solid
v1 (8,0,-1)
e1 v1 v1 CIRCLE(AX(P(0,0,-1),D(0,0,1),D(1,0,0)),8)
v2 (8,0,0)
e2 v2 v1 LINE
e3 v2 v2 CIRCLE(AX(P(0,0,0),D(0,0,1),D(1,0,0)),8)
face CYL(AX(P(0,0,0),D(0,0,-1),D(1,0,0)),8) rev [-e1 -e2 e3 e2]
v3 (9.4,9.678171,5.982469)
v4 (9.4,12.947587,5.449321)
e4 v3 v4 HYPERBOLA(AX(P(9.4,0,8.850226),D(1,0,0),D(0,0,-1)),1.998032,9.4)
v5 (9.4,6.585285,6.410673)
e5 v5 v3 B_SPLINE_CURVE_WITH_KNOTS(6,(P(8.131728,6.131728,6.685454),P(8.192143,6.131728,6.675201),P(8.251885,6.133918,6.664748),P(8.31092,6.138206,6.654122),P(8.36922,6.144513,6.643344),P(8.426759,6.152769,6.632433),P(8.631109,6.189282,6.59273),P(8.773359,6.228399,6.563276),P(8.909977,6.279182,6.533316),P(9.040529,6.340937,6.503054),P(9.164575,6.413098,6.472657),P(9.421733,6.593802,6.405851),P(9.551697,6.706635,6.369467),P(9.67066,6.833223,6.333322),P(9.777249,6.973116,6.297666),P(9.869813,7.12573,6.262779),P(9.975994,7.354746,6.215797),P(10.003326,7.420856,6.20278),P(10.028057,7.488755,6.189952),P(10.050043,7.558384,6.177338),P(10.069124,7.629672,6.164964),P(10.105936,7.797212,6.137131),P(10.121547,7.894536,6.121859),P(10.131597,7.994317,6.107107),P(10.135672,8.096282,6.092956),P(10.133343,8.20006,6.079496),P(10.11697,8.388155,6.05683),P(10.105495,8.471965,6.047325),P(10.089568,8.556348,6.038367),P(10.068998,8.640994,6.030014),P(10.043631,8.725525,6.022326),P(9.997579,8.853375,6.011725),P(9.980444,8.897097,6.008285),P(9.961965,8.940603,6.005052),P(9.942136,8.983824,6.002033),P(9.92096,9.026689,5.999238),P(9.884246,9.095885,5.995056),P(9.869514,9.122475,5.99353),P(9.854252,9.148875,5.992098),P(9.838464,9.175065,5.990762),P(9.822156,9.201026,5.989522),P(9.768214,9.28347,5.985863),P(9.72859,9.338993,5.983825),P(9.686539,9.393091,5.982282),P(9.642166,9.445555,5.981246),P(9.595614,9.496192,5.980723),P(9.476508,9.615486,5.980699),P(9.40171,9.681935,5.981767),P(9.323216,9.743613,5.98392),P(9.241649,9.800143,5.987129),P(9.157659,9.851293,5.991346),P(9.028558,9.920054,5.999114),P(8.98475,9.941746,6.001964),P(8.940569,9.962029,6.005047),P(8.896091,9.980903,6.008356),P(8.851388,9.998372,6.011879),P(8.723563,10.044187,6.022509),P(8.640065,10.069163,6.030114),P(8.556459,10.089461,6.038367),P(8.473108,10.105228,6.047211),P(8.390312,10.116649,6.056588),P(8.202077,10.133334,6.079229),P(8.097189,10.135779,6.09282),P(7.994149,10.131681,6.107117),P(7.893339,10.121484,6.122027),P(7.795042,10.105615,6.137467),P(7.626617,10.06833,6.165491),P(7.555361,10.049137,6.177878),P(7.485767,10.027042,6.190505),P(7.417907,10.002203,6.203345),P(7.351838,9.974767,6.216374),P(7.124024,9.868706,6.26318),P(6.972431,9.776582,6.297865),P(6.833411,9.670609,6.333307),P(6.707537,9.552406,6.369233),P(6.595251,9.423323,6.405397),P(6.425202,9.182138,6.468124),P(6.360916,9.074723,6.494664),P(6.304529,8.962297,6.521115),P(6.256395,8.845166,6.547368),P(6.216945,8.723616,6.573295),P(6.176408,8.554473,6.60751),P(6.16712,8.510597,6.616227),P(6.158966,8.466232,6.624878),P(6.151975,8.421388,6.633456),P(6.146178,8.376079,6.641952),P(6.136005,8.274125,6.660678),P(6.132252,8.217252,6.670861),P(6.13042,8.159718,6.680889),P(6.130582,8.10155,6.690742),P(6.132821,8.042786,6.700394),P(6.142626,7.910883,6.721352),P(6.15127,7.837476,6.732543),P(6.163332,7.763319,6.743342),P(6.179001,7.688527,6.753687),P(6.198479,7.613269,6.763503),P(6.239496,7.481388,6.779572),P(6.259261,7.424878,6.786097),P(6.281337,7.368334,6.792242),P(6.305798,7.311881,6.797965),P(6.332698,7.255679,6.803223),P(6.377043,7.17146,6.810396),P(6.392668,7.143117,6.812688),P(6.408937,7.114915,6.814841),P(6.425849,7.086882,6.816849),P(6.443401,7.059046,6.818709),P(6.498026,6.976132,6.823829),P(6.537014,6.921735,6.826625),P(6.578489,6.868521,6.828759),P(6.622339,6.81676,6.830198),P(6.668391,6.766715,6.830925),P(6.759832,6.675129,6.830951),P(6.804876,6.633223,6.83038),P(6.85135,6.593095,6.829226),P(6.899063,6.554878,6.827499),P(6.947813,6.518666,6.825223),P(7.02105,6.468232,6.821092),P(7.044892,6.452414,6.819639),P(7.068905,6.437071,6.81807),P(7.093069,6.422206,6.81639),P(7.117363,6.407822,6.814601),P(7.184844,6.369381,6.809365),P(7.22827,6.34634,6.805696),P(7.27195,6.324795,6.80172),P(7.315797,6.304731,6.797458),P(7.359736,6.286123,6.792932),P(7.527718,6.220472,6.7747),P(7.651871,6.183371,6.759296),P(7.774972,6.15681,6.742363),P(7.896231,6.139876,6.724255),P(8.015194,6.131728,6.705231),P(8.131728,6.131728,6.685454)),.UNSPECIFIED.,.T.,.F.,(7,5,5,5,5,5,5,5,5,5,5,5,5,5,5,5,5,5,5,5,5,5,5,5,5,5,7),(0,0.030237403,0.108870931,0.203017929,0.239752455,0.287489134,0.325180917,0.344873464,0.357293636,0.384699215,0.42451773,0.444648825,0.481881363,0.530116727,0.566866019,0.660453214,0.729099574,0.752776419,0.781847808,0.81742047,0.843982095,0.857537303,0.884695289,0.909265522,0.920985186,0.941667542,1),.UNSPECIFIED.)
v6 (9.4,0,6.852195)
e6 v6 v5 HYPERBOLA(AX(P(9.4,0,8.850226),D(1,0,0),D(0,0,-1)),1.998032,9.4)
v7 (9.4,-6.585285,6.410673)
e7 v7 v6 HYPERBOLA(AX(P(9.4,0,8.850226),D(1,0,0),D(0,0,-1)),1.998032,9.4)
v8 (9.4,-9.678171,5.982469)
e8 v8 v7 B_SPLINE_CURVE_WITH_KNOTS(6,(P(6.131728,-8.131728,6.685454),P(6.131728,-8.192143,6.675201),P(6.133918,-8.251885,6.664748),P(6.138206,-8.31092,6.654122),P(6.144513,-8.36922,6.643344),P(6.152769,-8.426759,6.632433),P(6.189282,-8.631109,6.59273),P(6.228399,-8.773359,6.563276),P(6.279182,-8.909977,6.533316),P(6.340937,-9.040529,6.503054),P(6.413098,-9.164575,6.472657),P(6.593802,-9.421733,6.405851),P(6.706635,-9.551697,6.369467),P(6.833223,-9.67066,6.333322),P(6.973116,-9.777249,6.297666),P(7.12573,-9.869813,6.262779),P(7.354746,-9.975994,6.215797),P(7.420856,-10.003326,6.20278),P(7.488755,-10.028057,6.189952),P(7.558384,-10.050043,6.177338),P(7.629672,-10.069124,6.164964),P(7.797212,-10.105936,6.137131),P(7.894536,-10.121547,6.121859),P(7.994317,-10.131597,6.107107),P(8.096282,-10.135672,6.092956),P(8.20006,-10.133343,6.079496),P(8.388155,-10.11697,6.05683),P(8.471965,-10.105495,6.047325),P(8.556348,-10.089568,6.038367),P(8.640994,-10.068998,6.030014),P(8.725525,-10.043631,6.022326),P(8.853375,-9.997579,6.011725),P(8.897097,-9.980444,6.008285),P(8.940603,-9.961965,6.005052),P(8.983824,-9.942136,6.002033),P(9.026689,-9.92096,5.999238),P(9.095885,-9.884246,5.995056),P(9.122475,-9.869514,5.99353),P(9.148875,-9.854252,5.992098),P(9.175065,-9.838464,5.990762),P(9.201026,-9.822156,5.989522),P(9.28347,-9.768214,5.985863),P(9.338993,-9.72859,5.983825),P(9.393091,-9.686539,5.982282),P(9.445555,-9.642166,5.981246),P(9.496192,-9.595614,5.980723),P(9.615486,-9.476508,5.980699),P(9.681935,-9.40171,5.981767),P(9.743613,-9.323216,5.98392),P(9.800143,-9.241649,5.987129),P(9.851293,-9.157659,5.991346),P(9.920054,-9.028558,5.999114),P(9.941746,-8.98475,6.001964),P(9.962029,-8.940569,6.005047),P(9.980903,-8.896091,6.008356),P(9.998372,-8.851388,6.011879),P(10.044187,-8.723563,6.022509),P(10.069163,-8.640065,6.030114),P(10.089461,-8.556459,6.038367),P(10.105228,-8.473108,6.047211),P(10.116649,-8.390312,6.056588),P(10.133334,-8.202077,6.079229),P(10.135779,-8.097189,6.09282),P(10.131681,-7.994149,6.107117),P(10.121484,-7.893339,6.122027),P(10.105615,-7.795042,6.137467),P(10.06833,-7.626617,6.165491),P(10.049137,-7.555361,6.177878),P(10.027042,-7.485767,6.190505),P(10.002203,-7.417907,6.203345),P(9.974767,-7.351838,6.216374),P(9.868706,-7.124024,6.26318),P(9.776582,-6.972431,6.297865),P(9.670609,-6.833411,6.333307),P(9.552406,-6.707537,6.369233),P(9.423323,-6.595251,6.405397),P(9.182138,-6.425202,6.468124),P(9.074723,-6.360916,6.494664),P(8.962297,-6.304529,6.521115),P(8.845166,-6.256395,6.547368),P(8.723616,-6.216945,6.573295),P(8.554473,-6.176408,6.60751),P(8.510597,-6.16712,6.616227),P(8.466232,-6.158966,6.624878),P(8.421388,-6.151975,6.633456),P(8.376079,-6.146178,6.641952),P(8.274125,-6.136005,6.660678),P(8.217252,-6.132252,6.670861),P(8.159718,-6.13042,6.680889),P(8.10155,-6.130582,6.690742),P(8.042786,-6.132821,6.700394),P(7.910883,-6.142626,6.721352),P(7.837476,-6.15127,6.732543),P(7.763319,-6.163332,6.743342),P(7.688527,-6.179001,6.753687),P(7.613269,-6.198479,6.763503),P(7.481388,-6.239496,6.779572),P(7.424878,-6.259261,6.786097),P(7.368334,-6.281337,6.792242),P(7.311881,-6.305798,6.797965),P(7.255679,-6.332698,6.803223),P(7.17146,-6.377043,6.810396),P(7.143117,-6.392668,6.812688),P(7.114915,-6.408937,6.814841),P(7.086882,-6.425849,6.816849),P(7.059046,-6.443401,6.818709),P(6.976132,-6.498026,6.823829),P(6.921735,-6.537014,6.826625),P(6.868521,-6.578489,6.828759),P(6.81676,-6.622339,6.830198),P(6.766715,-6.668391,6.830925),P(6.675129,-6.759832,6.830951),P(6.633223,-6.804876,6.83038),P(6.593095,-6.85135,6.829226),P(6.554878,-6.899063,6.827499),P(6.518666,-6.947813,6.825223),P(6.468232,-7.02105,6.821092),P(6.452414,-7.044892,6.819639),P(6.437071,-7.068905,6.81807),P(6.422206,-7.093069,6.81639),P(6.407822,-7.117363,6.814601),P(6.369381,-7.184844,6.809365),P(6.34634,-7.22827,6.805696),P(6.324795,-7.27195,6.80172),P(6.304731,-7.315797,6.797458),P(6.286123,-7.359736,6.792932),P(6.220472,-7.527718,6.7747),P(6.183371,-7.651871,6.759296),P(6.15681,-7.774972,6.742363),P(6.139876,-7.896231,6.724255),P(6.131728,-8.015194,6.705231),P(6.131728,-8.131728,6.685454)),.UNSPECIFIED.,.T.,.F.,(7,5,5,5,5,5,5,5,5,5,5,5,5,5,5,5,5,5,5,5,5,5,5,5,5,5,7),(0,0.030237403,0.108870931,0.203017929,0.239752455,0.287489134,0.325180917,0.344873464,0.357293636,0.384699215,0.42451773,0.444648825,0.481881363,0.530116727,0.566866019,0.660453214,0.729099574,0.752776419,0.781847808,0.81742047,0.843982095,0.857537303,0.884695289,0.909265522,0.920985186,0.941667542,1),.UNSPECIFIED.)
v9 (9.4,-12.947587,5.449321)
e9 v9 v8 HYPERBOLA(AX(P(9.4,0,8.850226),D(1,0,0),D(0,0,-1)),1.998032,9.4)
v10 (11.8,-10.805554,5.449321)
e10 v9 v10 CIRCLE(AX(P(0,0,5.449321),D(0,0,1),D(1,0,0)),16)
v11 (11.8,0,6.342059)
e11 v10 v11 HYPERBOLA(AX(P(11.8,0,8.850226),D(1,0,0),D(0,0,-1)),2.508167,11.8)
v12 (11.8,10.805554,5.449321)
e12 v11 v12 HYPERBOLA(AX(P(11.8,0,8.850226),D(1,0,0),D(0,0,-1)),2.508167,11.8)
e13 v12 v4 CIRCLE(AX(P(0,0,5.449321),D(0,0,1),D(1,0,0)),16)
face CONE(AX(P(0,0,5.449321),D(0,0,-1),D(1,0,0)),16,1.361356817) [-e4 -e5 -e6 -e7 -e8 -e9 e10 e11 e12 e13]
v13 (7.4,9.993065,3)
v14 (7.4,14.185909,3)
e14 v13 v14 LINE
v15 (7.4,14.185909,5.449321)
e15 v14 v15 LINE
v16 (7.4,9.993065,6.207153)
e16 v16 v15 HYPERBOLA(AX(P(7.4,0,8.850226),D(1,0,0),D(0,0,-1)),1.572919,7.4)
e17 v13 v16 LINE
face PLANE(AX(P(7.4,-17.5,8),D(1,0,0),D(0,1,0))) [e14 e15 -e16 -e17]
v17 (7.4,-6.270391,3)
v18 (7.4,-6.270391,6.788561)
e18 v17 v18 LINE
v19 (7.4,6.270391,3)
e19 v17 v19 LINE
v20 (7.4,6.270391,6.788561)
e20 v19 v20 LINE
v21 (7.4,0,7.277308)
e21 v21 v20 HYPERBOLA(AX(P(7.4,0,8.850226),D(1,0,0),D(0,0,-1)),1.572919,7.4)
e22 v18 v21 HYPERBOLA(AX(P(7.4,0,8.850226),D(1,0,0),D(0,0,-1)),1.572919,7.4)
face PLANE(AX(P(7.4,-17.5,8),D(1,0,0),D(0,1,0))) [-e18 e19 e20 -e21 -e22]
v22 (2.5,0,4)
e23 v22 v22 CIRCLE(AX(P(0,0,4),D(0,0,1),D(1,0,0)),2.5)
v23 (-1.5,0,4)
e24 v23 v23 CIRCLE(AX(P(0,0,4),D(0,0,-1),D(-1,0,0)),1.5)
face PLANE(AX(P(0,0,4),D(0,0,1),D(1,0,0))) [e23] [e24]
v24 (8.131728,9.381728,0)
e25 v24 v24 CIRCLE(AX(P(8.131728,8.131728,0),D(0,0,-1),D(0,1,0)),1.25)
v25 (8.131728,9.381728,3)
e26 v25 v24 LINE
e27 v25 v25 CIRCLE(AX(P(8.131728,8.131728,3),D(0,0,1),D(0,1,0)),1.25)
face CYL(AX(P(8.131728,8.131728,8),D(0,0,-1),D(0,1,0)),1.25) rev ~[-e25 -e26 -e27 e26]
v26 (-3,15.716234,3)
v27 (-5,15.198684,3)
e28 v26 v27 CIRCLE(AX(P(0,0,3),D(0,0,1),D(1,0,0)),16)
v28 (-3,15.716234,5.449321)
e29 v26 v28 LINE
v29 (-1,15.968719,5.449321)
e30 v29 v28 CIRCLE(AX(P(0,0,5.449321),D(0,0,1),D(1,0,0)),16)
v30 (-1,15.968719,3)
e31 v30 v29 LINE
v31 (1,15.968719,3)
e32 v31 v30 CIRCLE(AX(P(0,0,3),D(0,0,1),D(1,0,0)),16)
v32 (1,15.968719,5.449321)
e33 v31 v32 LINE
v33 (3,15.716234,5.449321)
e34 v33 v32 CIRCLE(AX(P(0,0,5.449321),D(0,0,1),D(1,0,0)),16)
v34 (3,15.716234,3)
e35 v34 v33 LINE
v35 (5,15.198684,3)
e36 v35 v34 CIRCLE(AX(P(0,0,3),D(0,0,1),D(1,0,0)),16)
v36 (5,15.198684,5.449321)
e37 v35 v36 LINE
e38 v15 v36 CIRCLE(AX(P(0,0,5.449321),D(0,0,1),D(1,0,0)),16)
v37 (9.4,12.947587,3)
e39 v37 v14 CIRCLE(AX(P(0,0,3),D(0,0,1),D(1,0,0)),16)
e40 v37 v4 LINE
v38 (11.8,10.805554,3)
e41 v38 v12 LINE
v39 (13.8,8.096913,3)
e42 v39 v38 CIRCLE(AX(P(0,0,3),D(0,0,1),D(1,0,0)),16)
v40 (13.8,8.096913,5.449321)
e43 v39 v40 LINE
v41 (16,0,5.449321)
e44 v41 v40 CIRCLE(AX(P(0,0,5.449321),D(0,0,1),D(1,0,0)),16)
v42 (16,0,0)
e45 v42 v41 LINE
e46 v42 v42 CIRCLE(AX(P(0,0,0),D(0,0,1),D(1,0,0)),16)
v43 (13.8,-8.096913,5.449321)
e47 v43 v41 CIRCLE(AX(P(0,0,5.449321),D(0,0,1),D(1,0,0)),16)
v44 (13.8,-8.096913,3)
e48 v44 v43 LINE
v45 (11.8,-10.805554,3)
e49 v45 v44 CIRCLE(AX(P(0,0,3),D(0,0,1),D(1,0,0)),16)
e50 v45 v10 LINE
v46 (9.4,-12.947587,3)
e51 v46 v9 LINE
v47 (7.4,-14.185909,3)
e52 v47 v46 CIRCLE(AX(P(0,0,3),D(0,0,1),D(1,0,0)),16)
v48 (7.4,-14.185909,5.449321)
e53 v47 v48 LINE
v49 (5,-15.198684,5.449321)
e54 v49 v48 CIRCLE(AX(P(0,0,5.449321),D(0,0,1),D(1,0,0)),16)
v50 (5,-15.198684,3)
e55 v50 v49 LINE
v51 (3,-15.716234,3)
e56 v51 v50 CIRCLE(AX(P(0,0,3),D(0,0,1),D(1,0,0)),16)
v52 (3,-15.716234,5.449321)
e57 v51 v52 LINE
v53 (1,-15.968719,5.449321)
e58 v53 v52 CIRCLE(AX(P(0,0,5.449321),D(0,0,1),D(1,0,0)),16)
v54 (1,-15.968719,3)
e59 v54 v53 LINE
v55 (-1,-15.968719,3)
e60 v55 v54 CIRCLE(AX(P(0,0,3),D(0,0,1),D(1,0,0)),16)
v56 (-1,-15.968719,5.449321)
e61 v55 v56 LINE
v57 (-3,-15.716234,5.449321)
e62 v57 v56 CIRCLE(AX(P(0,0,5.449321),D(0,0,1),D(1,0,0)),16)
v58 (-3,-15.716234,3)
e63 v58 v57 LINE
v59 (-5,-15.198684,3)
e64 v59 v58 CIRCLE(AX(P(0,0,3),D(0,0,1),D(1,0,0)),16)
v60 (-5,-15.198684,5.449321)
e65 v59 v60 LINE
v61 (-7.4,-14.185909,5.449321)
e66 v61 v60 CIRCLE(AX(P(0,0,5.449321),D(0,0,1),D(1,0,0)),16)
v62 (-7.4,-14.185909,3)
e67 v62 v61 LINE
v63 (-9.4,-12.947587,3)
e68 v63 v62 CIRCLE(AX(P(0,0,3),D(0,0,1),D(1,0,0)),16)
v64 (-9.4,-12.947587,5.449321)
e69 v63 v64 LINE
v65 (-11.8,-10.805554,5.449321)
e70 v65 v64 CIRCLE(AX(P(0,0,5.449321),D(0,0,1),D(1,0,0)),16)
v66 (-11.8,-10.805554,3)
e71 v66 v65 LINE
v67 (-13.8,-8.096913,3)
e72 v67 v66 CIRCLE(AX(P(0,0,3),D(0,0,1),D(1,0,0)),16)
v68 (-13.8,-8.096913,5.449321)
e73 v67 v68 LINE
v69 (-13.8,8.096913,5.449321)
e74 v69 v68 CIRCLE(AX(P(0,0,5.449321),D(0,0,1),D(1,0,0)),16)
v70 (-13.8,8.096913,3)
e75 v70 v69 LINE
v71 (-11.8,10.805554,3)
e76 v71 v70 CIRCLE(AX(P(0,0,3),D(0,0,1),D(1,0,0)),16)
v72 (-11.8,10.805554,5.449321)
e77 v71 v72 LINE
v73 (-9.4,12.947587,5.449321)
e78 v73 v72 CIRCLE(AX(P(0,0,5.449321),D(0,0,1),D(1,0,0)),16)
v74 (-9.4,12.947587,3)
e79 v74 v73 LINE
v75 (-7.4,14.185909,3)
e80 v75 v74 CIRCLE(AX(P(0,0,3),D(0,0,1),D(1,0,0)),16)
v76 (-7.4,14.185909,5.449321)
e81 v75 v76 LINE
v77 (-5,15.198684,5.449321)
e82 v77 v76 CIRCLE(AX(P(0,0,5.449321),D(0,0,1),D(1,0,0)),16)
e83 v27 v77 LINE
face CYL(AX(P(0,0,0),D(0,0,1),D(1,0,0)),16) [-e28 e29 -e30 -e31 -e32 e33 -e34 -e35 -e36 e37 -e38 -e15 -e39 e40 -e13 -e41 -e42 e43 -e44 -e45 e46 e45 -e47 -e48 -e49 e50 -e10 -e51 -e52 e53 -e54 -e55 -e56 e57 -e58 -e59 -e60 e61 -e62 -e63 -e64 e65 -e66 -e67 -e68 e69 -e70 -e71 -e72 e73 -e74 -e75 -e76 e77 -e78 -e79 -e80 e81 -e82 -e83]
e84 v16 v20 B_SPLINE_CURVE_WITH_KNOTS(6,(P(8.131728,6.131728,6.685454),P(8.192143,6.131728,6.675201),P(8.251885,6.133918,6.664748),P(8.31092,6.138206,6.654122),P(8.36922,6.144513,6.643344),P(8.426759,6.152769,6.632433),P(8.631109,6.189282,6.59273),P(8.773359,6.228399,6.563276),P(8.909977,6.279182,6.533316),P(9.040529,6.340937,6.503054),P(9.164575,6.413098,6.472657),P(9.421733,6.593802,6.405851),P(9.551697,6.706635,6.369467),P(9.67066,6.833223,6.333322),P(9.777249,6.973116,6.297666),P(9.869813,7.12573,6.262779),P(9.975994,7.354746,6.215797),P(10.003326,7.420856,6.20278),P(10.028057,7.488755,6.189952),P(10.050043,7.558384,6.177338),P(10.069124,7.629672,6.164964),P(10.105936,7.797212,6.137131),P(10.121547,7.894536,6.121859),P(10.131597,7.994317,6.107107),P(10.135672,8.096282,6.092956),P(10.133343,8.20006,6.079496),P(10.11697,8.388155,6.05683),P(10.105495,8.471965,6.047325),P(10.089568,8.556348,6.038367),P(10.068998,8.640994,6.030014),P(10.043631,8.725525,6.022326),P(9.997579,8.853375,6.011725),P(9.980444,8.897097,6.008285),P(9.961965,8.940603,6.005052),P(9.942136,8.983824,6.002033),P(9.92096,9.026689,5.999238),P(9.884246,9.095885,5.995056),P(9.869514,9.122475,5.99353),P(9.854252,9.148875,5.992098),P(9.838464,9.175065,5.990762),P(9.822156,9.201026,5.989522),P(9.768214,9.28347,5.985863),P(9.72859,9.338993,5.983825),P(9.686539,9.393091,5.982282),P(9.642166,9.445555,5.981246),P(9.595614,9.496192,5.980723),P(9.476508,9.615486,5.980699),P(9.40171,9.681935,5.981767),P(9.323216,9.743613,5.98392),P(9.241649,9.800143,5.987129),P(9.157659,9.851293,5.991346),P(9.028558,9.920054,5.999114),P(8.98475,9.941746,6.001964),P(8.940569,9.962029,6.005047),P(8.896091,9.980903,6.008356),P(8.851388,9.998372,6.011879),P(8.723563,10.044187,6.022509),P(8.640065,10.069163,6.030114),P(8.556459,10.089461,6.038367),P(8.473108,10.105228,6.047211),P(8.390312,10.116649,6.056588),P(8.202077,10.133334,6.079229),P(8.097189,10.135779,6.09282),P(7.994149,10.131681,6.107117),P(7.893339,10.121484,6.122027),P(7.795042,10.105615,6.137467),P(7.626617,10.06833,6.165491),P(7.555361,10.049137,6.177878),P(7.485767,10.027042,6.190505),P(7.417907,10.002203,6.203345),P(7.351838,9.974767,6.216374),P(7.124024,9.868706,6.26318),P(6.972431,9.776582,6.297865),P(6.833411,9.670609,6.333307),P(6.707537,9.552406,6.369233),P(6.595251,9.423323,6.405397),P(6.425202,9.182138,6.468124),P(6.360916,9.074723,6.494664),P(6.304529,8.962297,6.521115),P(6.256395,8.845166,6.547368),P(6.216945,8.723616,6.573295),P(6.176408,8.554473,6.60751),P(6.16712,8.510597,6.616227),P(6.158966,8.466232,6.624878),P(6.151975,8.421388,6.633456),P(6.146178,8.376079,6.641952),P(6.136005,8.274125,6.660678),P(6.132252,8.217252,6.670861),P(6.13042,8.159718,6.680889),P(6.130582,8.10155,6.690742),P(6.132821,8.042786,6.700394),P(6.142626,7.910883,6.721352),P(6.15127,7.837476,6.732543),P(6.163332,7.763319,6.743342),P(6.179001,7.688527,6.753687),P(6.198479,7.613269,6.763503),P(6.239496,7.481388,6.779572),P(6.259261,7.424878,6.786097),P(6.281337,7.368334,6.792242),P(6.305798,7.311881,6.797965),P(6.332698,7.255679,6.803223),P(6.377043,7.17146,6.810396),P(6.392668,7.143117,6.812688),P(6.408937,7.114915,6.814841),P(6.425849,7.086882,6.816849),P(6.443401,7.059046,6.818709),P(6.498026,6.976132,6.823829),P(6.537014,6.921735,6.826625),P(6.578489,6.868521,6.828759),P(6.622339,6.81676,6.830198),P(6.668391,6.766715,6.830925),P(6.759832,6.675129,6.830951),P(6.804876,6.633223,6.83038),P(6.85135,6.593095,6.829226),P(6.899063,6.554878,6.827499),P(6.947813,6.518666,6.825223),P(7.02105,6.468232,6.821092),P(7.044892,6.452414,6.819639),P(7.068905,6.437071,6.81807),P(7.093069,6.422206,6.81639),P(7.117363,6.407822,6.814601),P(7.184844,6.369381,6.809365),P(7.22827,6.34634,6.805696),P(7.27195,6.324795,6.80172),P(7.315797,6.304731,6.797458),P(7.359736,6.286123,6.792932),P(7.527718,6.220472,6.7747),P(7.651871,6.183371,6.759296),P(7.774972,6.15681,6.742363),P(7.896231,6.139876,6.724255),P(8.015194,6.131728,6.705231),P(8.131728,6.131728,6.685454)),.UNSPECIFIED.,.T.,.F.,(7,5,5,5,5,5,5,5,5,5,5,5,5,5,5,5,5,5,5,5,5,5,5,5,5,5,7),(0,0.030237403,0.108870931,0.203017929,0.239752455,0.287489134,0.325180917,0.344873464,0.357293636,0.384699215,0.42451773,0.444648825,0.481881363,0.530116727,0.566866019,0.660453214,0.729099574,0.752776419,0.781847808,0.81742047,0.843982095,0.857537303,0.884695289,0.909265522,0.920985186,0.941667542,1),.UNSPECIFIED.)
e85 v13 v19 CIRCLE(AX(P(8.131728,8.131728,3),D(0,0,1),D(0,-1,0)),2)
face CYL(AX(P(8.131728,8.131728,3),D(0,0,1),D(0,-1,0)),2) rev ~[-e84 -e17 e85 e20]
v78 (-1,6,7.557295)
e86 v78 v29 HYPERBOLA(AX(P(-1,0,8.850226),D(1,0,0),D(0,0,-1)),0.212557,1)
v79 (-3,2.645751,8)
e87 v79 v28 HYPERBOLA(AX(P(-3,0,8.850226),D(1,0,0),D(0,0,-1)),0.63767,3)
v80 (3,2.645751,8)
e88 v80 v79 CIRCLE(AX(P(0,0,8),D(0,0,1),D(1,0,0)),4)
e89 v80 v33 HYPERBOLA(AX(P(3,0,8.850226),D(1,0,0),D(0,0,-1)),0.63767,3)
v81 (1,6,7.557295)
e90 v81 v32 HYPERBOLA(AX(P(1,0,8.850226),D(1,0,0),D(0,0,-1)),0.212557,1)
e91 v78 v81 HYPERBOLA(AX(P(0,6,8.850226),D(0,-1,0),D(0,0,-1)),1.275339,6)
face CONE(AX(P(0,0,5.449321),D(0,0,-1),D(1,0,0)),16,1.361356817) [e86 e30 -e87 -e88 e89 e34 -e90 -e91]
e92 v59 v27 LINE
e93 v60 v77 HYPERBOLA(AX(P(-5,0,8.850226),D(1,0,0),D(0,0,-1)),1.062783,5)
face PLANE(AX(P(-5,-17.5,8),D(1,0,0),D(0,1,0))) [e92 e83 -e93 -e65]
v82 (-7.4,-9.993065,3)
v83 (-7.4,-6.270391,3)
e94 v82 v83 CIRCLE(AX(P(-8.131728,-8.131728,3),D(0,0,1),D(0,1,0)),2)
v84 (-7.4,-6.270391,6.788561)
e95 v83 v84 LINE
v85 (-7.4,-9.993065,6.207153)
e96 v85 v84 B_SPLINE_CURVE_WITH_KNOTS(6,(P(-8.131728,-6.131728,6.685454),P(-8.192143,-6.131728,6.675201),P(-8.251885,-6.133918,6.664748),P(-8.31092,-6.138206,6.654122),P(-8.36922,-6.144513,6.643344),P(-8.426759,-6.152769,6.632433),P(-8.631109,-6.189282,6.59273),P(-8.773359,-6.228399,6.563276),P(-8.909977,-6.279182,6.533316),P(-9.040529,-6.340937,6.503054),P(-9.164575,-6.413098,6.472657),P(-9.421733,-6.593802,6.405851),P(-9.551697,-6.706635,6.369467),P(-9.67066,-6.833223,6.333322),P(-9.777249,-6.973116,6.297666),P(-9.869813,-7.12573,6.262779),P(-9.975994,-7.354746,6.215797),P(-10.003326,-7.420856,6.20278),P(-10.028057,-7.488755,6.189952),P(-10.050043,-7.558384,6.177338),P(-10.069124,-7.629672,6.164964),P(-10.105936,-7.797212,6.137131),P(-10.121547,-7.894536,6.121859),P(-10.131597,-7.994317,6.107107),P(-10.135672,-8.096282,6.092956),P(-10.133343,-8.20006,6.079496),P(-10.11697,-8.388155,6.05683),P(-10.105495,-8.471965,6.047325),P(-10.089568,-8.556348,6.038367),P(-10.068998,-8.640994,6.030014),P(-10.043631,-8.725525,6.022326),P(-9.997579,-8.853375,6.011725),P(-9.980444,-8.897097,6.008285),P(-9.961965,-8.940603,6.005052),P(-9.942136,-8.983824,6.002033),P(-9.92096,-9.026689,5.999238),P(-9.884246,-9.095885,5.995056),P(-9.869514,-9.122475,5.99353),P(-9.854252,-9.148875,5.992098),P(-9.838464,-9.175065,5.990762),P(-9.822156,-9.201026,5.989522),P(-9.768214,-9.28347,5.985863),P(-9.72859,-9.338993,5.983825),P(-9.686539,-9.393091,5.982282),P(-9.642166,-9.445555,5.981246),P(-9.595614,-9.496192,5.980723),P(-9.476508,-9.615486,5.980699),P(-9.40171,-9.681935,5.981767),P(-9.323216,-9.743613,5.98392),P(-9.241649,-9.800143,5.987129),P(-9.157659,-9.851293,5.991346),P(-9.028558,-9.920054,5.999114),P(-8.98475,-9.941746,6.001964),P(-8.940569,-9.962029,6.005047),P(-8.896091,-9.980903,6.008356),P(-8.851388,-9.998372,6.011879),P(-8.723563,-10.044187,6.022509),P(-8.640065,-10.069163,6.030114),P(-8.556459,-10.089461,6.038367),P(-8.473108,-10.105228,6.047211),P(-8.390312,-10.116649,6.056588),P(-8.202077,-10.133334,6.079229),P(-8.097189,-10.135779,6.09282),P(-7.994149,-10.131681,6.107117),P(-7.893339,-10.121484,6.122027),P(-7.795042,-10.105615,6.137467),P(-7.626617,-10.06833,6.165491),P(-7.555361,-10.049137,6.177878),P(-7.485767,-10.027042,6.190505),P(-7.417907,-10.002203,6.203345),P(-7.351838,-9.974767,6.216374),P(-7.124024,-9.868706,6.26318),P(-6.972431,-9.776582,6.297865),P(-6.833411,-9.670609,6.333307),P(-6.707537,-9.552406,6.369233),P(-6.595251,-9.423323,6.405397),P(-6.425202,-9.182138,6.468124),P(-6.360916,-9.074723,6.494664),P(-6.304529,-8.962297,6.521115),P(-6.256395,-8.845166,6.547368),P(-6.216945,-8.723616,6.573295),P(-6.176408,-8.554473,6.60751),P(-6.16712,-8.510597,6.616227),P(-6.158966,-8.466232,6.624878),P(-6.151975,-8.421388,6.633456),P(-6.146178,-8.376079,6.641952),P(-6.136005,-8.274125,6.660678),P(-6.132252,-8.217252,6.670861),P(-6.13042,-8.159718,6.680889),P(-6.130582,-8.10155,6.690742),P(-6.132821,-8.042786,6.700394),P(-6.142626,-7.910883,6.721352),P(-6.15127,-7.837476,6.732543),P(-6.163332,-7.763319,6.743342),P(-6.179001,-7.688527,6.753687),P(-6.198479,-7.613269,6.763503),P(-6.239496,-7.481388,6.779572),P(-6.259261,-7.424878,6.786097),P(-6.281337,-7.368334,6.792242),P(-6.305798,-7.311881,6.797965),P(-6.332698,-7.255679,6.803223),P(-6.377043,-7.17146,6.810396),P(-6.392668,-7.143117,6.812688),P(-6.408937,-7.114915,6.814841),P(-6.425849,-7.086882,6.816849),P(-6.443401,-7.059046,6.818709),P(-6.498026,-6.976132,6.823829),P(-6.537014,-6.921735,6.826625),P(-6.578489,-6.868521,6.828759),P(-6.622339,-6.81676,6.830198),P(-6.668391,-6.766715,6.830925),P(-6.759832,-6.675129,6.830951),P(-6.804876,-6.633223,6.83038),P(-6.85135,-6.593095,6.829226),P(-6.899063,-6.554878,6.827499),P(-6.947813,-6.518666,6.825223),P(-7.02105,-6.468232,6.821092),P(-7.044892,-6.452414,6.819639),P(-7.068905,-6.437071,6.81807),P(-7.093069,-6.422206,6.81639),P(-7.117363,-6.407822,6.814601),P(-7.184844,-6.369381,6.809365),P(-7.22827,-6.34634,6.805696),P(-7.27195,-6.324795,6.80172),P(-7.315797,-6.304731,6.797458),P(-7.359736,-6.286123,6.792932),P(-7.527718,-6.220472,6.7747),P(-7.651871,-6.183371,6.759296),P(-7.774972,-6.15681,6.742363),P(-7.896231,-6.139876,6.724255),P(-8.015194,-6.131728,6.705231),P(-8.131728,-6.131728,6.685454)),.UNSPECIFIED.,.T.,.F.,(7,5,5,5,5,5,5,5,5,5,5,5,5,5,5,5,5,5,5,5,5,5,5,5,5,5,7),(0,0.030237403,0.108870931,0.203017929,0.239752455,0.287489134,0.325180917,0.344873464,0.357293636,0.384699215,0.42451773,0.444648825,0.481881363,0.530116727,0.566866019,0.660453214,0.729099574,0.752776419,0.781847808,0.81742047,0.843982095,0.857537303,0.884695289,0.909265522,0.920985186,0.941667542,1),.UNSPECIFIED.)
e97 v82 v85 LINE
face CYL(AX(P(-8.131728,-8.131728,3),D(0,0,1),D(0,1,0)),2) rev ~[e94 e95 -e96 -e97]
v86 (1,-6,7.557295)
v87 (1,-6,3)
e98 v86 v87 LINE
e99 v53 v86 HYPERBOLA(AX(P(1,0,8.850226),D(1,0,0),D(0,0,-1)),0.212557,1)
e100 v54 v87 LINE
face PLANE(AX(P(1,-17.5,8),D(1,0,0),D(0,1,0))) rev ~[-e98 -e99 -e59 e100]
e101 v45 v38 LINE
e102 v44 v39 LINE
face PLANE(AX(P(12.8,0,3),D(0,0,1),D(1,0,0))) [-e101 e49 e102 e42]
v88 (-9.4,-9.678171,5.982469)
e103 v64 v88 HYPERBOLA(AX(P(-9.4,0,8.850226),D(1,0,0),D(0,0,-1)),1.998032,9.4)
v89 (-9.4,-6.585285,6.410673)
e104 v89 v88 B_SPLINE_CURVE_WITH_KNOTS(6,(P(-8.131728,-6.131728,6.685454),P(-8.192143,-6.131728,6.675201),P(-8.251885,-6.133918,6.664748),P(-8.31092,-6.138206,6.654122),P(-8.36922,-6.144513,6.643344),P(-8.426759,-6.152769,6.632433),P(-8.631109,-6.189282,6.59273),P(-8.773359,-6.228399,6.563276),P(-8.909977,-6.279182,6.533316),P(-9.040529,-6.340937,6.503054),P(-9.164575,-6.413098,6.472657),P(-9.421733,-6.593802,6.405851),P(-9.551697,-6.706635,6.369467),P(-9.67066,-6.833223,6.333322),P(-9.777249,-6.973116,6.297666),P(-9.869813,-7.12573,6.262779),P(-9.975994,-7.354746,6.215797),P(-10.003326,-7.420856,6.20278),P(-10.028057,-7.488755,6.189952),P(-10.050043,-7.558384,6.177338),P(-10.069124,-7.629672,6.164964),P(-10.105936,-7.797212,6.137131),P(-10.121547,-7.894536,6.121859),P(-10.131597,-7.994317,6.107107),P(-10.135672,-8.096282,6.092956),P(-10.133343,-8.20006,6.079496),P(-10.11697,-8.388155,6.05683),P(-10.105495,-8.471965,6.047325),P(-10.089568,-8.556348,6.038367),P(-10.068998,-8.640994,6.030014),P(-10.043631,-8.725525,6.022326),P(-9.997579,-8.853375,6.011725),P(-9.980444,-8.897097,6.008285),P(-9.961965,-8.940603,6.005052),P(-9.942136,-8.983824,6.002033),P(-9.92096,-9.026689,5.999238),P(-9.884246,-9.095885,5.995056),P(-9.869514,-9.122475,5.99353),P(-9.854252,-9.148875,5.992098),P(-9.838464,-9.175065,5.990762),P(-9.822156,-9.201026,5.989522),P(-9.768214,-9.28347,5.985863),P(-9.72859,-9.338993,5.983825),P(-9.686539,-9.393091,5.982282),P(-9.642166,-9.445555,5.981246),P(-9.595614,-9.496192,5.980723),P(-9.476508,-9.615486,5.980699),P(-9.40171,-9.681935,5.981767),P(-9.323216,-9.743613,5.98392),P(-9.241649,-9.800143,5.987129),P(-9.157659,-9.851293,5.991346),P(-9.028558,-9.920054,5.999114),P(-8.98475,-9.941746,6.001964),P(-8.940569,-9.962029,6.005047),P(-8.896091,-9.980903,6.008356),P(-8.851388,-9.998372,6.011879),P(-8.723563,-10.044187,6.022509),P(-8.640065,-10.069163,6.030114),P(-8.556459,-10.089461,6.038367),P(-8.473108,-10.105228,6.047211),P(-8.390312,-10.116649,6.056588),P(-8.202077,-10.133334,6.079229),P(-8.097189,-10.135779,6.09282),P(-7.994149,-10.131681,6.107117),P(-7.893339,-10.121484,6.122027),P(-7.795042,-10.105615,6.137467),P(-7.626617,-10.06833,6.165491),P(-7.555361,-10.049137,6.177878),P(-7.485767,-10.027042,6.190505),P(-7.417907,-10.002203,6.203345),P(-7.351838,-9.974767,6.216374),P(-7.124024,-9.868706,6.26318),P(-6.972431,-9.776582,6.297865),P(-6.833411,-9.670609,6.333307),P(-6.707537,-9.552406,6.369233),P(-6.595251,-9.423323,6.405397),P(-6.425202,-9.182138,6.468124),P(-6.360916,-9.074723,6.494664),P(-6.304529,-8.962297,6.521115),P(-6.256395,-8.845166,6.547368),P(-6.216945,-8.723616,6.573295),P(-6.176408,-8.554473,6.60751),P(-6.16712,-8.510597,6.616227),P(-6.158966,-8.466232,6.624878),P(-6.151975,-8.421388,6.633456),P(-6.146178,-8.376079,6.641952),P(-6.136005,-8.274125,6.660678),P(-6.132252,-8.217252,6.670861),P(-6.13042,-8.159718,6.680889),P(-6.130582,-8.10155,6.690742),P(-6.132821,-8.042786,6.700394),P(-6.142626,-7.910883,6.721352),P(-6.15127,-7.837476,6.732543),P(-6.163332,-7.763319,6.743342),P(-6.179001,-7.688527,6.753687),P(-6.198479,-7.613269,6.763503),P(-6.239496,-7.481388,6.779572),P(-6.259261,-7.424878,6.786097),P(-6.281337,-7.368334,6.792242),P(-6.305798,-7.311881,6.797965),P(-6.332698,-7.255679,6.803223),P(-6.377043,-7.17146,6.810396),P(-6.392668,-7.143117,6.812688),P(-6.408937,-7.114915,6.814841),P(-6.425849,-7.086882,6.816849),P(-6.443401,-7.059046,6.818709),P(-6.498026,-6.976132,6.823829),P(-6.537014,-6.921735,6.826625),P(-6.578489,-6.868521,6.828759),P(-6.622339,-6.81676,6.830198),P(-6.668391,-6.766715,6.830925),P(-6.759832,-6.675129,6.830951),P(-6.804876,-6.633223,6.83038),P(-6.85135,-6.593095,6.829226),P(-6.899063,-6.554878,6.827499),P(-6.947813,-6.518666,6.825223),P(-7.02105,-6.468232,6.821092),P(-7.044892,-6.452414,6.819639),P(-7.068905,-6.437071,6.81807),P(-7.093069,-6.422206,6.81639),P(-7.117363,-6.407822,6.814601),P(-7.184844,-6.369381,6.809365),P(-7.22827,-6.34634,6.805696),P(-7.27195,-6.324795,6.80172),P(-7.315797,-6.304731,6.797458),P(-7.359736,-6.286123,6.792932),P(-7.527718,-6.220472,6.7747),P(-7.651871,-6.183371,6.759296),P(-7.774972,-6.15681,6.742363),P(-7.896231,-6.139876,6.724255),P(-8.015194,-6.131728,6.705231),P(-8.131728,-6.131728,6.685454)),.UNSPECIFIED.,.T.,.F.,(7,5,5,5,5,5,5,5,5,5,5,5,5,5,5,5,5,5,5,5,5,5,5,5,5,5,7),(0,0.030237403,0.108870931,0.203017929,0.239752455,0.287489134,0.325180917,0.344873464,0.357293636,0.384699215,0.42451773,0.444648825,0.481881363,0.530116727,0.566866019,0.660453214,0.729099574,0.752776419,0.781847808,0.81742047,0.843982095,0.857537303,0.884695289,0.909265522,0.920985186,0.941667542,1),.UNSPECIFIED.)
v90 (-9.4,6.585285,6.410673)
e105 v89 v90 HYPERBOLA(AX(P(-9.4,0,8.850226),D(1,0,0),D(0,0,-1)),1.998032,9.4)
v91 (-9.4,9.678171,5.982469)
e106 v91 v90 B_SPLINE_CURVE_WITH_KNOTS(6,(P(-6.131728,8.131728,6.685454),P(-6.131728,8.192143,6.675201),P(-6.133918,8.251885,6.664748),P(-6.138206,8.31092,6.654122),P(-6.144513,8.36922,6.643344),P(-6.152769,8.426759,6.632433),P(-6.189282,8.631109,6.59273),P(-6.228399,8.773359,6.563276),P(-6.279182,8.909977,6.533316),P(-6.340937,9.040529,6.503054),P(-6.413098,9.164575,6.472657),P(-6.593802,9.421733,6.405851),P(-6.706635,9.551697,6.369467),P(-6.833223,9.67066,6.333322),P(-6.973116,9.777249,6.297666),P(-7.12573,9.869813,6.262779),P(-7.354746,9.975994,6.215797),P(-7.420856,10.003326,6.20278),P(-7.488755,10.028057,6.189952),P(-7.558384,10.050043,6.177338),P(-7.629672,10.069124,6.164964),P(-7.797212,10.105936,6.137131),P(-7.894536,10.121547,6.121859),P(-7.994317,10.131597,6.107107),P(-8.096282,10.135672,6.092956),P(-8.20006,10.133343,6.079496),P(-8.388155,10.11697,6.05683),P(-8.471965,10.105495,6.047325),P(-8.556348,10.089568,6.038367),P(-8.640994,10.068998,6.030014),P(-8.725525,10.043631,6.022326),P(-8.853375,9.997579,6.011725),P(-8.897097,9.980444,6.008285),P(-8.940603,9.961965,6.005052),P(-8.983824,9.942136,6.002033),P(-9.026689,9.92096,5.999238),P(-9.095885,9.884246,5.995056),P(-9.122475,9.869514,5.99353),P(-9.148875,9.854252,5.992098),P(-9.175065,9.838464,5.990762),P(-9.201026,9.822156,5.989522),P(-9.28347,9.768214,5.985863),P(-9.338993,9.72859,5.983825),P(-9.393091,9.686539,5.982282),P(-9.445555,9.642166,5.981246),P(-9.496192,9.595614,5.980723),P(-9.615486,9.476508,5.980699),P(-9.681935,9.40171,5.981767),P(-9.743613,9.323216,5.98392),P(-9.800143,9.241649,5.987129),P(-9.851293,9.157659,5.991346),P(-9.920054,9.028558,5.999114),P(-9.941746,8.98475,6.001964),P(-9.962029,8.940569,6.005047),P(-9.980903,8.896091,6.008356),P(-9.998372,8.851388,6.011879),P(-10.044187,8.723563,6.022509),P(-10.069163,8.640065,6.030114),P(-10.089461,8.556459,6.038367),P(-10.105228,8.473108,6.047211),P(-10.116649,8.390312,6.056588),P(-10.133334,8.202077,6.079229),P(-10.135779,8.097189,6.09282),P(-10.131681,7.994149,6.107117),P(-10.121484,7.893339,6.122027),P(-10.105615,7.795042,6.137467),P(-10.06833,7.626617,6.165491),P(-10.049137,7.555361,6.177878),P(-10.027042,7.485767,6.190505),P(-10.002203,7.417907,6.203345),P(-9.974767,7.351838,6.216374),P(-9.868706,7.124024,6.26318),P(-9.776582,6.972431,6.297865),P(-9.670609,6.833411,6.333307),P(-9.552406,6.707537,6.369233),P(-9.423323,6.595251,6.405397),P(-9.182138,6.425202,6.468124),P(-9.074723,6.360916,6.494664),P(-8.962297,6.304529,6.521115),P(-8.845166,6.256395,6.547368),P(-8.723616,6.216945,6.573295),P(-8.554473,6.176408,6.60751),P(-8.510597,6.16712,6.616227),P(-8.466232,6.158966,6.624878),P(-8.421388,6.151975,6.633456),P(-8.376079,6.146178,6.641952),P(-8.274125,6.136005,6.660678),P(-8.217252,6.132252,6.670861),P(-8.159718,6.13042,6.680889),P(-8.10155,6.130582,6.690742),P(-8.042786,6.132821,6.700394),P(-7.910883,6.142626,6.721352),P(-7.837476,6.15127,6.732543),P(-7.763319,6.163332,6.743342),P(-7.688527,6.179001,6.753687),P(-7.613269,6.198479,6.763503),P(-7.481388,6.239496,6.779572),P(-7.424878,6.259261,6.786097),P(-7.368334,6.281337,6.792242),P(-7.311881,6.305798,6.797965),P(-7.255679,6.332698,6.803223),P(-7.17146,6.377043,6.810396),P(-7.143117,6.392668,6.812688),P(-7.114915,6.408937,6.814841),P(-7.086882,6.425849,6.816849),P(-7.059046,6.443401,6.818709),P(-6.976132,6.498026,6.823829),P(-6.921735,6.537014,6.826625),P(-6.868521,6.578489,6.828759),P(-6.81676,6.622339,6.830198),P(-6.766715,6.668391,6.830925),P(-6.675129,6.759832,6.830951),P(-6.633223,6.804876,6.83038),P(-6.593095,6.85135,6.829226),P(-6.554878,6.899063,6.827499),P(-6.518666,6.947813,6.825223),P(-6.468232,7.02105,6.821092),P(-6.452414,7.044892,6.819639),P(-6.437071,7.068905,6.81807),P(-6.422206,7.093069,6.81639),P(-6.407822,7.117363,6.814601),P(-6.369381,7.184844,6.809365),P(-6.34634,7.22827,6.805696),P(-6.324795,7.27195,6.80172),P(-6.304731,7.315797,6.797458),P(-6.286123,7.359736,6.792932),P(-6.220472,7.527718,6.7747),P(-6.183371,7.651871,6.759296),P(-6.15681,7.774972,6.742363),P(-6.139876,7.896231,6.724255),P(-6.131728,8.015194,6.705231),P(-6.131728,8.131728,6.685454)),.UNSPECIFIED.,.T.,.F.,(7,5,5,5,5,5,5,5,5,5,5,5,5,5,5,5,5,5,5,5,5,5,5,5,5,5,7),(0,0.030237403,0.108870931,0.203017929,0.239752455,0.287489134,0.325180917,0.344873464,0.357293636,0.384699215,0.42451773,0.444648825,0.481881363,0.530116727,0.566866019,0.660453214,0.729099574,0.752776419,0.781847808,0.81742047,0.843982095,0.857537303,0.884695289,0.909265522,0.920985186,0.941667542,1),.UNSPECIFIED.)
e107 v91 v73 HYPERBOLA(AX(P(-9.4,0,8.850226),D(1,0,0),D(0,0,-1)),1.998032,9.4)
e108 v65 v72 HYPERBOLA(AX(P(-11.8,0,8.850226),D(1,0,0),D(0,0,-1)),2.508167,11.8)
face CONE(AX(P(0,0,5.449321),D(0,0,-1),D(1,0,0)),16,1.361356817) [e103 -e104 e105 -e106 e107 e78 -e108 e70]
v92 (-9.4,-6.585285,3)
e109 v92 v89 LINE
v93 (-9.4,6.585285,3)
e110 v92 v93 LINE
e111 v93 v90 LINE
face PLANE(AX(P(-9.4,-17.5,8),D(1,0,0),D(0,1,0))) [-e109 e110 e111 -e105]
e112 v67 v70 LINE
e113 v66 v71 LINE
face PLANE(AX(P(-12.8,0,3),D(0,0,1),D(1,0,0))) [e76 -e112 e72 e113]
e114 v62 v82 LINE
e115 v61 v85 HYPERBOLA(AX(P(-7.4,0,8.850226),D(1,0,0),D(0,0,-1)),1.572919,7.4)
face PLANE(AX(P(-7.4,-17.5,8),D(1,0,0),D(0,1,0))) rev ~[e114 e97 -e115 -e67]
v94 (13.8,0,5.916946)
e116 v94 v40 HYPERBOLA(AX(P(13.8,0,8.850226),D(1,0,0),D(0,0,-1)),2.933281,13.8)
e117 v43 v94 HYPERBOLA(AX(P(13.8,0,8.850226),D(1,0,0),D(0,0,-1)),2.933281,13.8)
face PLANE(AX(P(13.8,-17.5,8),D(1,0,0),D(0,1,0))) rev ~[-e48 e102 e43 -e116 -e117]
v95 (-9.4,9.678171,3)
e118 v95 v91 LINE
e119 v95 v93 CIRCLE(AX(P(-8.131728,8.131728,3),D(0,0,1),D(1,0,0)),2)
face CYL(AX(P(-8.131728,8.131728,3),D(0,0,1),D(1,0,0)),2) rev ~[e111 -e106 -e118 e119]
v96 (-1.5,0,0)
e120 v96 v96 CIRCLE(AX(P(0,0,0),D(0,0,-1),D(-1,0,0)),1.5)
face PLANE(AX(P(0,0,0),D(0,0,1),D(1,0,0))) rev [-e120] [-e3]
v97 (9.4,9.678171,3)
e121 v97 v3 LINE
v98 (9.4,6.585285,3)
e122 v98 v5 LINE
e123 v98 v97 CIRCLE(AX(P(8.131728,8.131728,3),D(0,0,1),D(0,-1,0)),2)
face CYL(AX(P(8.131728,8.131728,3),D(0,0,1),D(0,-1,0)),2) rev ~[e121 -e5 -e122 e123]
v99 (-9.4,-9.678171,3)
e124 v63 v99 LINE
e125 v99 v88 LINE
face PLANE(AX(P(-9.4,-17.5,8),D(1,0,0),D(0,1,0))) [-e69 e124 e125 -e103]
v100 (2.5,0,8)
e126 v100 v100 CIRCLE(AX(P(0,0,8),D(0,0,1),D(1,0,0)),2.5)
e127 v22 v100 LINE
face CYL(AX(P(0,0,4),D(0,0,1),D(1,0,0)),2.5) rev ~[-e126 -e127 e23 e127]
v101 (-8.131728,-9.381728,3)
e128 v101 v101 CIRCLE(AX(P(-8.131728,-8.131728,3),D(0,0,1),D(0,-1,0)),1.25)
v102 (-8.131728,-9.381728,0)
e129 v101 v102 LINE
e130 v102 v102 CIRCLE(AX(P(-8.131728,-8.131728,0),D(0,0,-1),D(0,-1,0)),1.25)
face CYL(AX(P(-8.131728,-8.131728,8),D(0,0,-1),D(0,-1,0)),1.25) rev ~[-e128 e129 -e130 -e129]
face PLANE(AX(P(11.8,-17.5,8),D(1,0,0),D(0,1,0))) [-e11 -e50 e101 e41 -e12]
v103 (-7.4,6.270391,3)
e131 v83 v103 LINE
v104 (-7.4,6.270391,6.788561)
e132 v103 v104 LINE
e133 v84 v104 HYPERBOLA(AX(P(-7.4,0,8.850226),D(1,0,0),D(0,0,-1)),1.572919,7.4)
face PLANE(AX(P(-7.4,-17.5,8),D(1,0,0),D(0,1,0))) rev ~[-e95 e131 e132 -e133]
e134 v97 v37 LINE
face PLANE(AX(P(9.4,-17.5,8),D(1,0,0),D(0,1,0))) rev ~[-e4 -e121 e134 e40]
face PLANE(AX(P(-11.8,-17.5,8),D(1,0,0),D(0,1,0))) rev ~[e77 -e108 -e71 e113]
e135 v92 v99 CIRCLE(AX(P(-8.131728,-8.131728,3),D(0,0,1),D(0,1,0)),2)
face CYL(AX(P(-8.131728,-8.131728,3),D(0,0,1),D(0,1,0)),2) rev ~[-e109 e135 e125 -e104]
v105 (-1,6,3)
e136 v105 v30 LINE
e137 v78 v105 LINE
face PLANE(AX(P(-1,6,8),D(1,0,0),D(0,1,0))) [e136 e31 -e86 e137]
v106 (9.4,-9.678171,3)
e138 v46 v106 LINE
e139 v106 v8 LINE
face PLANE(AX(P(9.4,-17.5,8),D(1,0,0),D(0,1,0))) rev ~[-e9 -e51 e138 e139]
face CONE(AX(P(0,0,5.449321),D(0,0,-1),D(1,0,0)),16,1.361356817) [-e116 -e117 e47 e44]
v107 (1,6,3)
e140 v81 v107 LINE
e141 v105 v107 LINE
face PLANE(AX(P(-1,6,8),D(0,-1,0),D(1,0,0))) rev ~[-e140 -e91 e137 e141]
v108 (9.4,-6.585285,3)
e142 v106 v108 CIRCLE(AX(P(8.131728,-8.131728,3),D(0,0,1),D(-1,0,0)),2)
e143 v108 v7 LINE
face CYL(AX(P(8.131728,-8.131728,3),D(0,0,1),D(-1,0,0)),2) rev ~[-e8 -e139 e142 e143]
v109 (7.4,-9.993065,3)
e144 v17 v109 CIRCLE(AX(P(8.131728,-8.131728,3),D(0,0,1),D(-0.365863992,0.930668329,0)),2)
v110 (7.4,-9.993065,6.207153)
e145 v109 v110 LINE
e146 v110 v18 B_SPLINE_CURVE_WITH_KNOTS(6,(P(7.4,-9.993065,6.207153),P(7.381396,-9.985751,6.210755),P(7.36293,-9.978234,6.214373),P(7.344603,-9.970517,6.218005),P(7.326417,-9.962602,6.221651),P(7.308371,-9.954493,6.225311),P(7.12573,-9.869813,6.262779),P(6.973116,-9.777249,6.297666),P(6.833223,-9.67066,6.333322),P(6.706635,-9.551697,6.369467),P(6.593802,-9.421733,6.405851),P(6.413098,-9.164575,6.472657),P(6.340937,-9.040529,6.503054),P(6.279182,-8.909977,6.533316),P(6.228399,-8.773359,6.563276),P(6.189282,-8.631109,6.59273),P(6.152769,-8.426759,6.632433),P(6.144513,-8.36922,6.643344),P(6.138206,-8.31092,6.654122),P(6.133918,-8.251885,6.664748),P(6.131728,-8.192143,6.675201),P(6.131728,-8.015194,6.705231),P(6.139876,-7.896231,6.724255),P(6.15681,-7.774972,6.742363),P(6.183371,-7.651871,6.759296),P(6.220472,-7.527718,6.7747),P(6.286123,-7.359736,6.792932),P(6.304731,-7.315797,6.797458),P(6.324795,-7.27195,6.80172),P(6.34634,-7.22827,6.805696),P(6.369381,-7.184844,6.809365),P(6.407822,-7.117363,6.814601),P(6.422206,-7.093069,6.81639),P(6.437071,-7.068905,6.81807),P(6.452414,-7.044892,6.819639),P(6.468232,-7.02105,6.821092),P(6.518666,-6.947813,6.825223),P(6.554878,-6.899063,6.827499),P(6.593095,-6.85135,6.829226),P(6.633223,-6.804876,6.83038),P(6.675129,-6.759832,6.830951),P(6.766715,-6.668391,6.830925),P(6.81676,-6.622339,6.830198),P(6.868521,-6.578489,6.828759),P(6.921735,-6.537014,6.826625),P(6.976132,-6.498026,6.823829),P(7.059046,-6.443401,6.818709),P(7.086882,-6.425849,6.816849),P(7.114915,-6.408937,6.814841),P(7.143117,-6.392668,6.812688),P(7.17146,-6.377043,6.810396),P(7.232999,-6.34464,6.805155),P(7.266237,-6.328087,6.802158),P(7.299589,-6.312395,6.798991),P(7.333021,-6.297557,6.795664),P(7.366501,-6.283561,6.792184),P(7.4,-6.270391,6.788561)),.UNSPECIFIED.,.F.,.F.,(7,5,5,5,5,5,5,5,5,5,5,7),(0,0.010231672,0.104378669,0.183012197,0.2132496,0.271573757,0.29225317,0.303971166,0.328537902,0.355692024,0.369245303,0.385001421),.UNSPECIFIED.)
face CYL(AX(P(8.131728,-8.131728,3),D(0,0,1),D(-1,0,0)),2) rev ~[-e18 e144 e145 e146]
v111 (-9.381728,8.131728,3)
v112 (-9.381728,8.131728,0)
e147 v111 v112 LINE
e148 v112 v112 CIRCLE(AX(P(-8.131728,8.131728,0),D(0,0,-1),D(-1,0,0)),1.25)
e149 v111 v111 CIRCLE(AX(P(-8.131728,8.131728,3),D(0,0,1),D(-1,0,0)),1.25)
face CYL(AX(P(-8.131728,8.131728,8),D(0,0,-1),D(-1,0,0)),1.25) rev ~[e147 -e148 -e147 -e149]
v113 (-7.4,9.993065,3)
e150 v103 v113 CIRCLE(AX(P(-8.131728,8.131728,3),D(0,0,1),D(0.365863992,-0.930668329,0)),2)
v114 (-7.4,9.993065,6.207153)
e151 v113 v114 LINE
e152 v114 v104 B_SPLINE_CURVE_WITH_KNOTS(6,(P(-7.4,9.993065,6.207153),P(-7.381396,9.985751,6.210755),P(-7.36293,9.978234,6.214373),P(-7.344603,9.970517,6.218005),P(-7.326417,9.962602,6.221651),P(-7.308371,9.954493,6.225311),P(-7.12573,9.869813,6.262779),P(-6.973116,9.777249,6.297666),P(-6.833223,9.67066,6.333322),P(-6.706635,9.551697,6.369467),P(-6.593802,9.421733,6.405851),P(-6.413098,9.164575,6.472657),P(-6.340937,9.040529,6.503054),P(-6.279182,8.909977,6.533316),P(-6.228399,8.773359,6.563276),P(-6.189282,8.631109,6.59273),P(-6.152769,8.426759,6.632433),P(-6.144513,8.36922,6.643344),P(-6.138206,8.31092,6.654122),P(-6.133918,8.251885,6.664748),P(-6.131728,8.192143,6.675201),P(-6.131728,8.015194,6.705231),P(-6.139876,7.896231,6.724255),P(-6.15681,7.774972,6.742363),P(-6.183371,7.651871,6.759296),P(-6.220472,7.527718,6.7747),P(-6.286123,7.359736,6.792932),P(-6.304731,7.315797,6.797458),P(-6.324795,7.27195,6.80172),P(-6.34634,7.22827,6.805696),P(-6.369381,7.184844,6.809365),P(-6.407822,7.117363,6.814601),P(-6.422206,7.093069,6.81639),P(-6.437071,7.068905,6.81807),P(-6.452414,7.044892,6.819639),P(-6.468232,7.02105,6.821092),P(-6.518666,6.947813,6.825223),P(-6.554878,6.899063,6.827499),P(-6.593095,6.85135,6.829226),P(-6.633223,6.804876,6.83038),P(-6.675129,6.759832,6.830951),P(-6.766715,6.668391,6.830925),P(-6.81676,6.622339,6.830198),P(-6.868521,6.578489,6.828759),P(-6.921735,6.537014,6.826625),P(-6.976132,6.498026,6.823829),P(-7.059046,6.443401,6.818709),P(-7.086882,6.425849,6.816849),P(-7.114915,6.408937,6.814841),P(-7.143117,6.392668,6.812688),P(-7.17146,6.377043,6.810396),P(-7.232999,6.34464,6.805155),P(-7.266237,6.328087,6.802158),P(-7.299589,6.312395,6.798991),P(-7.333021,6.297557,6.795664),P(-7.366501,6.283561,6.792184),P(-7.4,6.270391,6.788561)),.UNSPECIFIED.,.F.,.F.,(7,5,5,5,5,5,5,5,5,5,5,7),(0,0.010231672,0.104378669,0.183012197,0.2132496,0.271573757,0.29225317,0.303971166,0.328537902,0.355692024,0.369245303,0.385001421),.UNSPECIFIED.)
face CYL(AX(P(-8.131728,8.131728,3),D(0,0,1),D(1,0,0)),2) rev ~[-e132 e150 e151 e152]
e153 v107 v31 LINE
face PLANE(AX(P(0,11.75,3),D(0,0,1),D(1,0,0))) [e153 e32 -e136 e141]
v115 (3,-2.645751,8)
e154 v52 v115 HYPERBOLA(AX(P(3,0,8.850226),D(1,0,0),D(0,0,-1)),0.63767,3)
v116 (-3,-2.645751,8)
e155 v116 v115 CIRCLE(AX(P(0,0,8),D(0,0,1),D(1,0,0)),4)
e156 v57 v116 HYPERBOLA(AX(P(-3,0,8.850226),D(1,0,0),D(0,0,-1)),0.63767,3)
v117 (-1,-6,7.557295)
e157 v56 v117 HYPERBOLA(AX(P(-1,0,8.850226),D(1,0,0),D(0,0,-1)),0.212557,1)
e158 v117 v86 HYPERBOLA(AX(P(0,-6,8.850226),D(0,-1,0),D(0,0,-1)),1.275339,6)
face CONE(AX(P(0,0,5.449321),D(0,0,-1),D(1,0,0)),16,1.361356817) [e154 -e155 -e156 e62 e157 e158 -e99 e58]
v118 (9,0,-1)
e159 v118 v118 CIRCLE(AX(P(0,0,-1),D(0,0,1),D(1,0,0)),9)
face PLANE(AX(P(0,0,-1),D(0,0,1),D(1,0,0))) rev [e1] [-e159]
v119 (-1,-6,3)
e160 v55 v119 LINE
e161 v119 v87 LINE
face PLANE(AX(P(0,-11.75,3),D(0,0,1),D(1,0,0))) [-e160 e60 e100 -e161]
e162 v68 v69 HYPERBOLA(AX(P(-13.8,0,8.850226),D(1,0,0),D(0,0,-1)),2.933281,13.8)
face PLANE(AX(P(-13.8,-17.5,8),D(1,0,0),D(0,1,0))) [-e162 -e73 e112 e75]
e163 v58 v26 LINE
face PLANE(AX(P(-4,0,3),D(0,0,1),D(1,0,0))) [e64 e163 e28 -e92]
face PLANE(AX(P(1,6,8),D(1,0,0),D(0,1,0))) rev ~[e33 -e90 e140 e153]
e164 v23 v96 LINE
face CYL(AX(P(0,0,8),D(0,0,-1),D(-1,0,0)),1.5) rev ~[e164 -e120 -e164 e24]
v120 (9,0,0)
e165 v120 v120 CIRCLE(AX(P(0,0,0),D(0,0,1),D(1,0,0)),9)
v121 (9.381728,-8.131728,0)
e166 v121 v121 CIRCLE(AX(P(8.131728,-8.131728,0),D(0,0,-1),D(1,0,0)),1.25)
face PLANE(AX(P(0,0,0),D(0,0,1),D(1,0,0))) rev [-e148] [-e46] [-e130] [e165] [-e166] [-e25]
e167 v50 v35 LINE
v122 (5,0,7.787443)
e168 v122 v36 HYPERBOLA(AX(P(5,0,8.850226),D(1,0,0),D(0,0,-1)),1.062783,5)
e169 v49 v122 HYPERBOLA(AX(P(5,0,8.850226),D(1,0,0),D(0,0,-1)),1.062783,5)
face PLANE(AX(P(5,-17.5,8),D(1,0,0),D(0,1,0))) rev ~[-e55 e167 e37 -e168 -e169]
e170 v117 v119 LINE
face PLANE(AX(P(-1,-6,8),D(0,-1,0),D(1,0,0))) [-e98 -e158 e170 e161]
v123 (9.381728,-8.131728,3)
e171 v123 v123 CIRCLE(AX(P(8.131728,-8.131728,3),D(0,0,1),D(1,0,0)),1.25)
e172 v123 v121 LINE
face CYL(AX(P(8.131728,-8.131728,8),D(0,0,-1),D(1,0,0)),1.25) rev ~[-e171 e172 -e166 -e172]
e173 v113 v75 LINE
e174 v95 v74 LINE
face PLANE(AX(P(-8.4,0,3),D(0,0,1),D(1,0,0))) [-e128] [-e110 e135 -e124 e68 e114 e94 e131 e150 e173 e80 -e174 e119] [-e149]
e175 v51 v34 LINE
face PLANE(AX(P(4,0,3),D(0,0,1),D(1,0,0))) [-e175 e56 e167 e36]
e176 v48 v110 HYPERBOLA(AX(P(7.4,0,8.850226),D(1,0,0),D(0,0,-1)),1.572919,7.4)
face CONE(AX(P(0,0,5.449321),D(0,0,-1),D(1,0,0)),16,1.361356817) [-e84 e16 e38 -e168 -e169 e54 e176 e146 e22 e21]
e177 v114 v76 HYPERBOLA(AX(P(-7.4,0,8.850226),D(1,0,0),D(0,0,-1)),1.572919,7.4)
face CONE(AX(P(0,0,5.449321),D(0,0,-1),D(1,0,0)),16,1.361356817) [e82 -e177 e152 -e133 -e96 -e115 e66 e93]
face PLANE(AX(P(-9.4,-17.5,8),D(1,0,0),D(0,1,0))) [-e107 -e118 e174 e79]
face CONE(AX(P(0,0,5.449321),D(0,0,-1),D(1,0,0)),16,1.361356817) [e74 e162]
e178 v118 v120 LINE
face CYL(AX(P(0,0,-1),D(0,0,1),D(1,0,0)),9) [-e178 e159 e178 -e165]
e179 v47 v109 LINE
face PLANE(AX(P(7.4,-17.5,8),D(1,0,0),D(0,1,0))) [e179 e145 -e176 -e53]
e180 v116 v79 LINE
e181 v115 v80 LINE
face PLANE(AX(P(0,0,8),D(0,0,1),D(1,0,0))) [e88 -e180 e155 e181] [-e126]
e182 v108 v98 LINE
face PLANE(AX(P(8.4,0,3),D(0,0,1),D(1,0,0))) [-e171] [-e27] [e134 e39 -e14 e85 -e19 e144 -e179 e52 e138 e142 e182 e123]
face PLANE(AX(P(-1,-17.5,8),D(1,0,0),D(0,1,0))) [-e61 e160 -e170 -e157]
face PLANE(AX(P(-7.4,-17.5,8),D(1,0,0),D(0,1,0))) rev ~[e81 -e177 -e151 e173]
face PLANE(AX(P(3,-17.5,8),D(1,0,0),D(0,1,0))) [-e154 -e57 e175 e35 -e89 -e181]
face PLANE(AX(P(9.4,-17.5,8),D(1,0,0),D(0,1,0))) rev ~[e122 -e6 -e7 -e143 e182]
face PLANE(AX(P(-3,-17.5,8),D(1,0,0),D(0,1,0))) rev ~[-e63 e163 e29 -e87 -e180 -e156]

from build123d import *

# Parameters (mm, degrees)
F3_D            = 3
F3_CBORE_D      = 5
F3_CBORE_DEPTH  = 4
F4_D            = 2.5
F4_CBORE_D      = 4
F4_CBORE_DEPTH  = 5
F4_COPIES_COUNT = 4
F5_W            = 2
F5_H            = 35
F5_H_2          = 11.5
F6_DEPTH        = 5


# Not quite as in the source:
# - a pattern or mirror of a feature is missing from the dataset's text; its kind, count and spacing are read off the source's solid


with BuildPart() as f1:
    # F0 (on Front) → F1 (revolve)
    with BuildSketch(Plane.XZ):
        Polygon((0, 8), (0, 0), (8, 0), (8, -1), (9, -1), (9, 0), (16, 0), (16, 5.44932126), (4, 8), align=None)
    revolve(axis=Axis((0, 0, 4), (0, 0, 1)))

    # F3 (through all)
    with Locations(Plane.XY.offset(8)):
        with Locations((0, 0)):
            CounterBoreHole(F3_D / 2, F3_CBORE_D / 2, F3_CBORE_DEPTH)

    # F4 (through all)
    with Locations(Plane.XY.offset(8)):
        with Locations((-8.1317279836, 8.1317279836)):
            f4 = CounterBoreHole(F4_D / 2, F4_CBORE_D / 2, F4_CBORE_DEPTH)

    # F4_copies: F4 ×4 about axis
    f4_copies_axis = Axis((0, 0, 0), (0, 0, 1))
    for i in range(1, F4_COPIES_COUNT):
        add(f4.rotate(f4_copies_axis, i * 360 / F4_COPIES_COUNT), mode=Mode.SUBTRACT)

    # F5 (on face) → F6 (cut)
    with BuildSketch(Plane.XY.offset(8)):
        with Locations((-4, 0)):
            Rectangle(F5_W, F5_H)
        with Locations((-8.4, 0)):
            Rectangle(F5_W, F5_H)
        with Locations((-12.8, 0)):
            Rectangle(F5_W, F5_H)
        with Locations((4, 0)):
            Rectangle(F5_W, F5_H)
        with Locations((8.4, 0)):
            Rectangle(F5_W, F5_H)
        with Locations((12.8, 0)):
            Rectangle(F5_W, F5_H)
        with Locations((0, 11.75)):
            Rectangle(F5_W, F5_H_2)
        with Locations((0, -11.75)):
            Rectangle(F5_W, F5_H_2)
    extrude(amount=-F6_DEPTH, mode=Mode.SUBTRACT)


solid = f1.part
